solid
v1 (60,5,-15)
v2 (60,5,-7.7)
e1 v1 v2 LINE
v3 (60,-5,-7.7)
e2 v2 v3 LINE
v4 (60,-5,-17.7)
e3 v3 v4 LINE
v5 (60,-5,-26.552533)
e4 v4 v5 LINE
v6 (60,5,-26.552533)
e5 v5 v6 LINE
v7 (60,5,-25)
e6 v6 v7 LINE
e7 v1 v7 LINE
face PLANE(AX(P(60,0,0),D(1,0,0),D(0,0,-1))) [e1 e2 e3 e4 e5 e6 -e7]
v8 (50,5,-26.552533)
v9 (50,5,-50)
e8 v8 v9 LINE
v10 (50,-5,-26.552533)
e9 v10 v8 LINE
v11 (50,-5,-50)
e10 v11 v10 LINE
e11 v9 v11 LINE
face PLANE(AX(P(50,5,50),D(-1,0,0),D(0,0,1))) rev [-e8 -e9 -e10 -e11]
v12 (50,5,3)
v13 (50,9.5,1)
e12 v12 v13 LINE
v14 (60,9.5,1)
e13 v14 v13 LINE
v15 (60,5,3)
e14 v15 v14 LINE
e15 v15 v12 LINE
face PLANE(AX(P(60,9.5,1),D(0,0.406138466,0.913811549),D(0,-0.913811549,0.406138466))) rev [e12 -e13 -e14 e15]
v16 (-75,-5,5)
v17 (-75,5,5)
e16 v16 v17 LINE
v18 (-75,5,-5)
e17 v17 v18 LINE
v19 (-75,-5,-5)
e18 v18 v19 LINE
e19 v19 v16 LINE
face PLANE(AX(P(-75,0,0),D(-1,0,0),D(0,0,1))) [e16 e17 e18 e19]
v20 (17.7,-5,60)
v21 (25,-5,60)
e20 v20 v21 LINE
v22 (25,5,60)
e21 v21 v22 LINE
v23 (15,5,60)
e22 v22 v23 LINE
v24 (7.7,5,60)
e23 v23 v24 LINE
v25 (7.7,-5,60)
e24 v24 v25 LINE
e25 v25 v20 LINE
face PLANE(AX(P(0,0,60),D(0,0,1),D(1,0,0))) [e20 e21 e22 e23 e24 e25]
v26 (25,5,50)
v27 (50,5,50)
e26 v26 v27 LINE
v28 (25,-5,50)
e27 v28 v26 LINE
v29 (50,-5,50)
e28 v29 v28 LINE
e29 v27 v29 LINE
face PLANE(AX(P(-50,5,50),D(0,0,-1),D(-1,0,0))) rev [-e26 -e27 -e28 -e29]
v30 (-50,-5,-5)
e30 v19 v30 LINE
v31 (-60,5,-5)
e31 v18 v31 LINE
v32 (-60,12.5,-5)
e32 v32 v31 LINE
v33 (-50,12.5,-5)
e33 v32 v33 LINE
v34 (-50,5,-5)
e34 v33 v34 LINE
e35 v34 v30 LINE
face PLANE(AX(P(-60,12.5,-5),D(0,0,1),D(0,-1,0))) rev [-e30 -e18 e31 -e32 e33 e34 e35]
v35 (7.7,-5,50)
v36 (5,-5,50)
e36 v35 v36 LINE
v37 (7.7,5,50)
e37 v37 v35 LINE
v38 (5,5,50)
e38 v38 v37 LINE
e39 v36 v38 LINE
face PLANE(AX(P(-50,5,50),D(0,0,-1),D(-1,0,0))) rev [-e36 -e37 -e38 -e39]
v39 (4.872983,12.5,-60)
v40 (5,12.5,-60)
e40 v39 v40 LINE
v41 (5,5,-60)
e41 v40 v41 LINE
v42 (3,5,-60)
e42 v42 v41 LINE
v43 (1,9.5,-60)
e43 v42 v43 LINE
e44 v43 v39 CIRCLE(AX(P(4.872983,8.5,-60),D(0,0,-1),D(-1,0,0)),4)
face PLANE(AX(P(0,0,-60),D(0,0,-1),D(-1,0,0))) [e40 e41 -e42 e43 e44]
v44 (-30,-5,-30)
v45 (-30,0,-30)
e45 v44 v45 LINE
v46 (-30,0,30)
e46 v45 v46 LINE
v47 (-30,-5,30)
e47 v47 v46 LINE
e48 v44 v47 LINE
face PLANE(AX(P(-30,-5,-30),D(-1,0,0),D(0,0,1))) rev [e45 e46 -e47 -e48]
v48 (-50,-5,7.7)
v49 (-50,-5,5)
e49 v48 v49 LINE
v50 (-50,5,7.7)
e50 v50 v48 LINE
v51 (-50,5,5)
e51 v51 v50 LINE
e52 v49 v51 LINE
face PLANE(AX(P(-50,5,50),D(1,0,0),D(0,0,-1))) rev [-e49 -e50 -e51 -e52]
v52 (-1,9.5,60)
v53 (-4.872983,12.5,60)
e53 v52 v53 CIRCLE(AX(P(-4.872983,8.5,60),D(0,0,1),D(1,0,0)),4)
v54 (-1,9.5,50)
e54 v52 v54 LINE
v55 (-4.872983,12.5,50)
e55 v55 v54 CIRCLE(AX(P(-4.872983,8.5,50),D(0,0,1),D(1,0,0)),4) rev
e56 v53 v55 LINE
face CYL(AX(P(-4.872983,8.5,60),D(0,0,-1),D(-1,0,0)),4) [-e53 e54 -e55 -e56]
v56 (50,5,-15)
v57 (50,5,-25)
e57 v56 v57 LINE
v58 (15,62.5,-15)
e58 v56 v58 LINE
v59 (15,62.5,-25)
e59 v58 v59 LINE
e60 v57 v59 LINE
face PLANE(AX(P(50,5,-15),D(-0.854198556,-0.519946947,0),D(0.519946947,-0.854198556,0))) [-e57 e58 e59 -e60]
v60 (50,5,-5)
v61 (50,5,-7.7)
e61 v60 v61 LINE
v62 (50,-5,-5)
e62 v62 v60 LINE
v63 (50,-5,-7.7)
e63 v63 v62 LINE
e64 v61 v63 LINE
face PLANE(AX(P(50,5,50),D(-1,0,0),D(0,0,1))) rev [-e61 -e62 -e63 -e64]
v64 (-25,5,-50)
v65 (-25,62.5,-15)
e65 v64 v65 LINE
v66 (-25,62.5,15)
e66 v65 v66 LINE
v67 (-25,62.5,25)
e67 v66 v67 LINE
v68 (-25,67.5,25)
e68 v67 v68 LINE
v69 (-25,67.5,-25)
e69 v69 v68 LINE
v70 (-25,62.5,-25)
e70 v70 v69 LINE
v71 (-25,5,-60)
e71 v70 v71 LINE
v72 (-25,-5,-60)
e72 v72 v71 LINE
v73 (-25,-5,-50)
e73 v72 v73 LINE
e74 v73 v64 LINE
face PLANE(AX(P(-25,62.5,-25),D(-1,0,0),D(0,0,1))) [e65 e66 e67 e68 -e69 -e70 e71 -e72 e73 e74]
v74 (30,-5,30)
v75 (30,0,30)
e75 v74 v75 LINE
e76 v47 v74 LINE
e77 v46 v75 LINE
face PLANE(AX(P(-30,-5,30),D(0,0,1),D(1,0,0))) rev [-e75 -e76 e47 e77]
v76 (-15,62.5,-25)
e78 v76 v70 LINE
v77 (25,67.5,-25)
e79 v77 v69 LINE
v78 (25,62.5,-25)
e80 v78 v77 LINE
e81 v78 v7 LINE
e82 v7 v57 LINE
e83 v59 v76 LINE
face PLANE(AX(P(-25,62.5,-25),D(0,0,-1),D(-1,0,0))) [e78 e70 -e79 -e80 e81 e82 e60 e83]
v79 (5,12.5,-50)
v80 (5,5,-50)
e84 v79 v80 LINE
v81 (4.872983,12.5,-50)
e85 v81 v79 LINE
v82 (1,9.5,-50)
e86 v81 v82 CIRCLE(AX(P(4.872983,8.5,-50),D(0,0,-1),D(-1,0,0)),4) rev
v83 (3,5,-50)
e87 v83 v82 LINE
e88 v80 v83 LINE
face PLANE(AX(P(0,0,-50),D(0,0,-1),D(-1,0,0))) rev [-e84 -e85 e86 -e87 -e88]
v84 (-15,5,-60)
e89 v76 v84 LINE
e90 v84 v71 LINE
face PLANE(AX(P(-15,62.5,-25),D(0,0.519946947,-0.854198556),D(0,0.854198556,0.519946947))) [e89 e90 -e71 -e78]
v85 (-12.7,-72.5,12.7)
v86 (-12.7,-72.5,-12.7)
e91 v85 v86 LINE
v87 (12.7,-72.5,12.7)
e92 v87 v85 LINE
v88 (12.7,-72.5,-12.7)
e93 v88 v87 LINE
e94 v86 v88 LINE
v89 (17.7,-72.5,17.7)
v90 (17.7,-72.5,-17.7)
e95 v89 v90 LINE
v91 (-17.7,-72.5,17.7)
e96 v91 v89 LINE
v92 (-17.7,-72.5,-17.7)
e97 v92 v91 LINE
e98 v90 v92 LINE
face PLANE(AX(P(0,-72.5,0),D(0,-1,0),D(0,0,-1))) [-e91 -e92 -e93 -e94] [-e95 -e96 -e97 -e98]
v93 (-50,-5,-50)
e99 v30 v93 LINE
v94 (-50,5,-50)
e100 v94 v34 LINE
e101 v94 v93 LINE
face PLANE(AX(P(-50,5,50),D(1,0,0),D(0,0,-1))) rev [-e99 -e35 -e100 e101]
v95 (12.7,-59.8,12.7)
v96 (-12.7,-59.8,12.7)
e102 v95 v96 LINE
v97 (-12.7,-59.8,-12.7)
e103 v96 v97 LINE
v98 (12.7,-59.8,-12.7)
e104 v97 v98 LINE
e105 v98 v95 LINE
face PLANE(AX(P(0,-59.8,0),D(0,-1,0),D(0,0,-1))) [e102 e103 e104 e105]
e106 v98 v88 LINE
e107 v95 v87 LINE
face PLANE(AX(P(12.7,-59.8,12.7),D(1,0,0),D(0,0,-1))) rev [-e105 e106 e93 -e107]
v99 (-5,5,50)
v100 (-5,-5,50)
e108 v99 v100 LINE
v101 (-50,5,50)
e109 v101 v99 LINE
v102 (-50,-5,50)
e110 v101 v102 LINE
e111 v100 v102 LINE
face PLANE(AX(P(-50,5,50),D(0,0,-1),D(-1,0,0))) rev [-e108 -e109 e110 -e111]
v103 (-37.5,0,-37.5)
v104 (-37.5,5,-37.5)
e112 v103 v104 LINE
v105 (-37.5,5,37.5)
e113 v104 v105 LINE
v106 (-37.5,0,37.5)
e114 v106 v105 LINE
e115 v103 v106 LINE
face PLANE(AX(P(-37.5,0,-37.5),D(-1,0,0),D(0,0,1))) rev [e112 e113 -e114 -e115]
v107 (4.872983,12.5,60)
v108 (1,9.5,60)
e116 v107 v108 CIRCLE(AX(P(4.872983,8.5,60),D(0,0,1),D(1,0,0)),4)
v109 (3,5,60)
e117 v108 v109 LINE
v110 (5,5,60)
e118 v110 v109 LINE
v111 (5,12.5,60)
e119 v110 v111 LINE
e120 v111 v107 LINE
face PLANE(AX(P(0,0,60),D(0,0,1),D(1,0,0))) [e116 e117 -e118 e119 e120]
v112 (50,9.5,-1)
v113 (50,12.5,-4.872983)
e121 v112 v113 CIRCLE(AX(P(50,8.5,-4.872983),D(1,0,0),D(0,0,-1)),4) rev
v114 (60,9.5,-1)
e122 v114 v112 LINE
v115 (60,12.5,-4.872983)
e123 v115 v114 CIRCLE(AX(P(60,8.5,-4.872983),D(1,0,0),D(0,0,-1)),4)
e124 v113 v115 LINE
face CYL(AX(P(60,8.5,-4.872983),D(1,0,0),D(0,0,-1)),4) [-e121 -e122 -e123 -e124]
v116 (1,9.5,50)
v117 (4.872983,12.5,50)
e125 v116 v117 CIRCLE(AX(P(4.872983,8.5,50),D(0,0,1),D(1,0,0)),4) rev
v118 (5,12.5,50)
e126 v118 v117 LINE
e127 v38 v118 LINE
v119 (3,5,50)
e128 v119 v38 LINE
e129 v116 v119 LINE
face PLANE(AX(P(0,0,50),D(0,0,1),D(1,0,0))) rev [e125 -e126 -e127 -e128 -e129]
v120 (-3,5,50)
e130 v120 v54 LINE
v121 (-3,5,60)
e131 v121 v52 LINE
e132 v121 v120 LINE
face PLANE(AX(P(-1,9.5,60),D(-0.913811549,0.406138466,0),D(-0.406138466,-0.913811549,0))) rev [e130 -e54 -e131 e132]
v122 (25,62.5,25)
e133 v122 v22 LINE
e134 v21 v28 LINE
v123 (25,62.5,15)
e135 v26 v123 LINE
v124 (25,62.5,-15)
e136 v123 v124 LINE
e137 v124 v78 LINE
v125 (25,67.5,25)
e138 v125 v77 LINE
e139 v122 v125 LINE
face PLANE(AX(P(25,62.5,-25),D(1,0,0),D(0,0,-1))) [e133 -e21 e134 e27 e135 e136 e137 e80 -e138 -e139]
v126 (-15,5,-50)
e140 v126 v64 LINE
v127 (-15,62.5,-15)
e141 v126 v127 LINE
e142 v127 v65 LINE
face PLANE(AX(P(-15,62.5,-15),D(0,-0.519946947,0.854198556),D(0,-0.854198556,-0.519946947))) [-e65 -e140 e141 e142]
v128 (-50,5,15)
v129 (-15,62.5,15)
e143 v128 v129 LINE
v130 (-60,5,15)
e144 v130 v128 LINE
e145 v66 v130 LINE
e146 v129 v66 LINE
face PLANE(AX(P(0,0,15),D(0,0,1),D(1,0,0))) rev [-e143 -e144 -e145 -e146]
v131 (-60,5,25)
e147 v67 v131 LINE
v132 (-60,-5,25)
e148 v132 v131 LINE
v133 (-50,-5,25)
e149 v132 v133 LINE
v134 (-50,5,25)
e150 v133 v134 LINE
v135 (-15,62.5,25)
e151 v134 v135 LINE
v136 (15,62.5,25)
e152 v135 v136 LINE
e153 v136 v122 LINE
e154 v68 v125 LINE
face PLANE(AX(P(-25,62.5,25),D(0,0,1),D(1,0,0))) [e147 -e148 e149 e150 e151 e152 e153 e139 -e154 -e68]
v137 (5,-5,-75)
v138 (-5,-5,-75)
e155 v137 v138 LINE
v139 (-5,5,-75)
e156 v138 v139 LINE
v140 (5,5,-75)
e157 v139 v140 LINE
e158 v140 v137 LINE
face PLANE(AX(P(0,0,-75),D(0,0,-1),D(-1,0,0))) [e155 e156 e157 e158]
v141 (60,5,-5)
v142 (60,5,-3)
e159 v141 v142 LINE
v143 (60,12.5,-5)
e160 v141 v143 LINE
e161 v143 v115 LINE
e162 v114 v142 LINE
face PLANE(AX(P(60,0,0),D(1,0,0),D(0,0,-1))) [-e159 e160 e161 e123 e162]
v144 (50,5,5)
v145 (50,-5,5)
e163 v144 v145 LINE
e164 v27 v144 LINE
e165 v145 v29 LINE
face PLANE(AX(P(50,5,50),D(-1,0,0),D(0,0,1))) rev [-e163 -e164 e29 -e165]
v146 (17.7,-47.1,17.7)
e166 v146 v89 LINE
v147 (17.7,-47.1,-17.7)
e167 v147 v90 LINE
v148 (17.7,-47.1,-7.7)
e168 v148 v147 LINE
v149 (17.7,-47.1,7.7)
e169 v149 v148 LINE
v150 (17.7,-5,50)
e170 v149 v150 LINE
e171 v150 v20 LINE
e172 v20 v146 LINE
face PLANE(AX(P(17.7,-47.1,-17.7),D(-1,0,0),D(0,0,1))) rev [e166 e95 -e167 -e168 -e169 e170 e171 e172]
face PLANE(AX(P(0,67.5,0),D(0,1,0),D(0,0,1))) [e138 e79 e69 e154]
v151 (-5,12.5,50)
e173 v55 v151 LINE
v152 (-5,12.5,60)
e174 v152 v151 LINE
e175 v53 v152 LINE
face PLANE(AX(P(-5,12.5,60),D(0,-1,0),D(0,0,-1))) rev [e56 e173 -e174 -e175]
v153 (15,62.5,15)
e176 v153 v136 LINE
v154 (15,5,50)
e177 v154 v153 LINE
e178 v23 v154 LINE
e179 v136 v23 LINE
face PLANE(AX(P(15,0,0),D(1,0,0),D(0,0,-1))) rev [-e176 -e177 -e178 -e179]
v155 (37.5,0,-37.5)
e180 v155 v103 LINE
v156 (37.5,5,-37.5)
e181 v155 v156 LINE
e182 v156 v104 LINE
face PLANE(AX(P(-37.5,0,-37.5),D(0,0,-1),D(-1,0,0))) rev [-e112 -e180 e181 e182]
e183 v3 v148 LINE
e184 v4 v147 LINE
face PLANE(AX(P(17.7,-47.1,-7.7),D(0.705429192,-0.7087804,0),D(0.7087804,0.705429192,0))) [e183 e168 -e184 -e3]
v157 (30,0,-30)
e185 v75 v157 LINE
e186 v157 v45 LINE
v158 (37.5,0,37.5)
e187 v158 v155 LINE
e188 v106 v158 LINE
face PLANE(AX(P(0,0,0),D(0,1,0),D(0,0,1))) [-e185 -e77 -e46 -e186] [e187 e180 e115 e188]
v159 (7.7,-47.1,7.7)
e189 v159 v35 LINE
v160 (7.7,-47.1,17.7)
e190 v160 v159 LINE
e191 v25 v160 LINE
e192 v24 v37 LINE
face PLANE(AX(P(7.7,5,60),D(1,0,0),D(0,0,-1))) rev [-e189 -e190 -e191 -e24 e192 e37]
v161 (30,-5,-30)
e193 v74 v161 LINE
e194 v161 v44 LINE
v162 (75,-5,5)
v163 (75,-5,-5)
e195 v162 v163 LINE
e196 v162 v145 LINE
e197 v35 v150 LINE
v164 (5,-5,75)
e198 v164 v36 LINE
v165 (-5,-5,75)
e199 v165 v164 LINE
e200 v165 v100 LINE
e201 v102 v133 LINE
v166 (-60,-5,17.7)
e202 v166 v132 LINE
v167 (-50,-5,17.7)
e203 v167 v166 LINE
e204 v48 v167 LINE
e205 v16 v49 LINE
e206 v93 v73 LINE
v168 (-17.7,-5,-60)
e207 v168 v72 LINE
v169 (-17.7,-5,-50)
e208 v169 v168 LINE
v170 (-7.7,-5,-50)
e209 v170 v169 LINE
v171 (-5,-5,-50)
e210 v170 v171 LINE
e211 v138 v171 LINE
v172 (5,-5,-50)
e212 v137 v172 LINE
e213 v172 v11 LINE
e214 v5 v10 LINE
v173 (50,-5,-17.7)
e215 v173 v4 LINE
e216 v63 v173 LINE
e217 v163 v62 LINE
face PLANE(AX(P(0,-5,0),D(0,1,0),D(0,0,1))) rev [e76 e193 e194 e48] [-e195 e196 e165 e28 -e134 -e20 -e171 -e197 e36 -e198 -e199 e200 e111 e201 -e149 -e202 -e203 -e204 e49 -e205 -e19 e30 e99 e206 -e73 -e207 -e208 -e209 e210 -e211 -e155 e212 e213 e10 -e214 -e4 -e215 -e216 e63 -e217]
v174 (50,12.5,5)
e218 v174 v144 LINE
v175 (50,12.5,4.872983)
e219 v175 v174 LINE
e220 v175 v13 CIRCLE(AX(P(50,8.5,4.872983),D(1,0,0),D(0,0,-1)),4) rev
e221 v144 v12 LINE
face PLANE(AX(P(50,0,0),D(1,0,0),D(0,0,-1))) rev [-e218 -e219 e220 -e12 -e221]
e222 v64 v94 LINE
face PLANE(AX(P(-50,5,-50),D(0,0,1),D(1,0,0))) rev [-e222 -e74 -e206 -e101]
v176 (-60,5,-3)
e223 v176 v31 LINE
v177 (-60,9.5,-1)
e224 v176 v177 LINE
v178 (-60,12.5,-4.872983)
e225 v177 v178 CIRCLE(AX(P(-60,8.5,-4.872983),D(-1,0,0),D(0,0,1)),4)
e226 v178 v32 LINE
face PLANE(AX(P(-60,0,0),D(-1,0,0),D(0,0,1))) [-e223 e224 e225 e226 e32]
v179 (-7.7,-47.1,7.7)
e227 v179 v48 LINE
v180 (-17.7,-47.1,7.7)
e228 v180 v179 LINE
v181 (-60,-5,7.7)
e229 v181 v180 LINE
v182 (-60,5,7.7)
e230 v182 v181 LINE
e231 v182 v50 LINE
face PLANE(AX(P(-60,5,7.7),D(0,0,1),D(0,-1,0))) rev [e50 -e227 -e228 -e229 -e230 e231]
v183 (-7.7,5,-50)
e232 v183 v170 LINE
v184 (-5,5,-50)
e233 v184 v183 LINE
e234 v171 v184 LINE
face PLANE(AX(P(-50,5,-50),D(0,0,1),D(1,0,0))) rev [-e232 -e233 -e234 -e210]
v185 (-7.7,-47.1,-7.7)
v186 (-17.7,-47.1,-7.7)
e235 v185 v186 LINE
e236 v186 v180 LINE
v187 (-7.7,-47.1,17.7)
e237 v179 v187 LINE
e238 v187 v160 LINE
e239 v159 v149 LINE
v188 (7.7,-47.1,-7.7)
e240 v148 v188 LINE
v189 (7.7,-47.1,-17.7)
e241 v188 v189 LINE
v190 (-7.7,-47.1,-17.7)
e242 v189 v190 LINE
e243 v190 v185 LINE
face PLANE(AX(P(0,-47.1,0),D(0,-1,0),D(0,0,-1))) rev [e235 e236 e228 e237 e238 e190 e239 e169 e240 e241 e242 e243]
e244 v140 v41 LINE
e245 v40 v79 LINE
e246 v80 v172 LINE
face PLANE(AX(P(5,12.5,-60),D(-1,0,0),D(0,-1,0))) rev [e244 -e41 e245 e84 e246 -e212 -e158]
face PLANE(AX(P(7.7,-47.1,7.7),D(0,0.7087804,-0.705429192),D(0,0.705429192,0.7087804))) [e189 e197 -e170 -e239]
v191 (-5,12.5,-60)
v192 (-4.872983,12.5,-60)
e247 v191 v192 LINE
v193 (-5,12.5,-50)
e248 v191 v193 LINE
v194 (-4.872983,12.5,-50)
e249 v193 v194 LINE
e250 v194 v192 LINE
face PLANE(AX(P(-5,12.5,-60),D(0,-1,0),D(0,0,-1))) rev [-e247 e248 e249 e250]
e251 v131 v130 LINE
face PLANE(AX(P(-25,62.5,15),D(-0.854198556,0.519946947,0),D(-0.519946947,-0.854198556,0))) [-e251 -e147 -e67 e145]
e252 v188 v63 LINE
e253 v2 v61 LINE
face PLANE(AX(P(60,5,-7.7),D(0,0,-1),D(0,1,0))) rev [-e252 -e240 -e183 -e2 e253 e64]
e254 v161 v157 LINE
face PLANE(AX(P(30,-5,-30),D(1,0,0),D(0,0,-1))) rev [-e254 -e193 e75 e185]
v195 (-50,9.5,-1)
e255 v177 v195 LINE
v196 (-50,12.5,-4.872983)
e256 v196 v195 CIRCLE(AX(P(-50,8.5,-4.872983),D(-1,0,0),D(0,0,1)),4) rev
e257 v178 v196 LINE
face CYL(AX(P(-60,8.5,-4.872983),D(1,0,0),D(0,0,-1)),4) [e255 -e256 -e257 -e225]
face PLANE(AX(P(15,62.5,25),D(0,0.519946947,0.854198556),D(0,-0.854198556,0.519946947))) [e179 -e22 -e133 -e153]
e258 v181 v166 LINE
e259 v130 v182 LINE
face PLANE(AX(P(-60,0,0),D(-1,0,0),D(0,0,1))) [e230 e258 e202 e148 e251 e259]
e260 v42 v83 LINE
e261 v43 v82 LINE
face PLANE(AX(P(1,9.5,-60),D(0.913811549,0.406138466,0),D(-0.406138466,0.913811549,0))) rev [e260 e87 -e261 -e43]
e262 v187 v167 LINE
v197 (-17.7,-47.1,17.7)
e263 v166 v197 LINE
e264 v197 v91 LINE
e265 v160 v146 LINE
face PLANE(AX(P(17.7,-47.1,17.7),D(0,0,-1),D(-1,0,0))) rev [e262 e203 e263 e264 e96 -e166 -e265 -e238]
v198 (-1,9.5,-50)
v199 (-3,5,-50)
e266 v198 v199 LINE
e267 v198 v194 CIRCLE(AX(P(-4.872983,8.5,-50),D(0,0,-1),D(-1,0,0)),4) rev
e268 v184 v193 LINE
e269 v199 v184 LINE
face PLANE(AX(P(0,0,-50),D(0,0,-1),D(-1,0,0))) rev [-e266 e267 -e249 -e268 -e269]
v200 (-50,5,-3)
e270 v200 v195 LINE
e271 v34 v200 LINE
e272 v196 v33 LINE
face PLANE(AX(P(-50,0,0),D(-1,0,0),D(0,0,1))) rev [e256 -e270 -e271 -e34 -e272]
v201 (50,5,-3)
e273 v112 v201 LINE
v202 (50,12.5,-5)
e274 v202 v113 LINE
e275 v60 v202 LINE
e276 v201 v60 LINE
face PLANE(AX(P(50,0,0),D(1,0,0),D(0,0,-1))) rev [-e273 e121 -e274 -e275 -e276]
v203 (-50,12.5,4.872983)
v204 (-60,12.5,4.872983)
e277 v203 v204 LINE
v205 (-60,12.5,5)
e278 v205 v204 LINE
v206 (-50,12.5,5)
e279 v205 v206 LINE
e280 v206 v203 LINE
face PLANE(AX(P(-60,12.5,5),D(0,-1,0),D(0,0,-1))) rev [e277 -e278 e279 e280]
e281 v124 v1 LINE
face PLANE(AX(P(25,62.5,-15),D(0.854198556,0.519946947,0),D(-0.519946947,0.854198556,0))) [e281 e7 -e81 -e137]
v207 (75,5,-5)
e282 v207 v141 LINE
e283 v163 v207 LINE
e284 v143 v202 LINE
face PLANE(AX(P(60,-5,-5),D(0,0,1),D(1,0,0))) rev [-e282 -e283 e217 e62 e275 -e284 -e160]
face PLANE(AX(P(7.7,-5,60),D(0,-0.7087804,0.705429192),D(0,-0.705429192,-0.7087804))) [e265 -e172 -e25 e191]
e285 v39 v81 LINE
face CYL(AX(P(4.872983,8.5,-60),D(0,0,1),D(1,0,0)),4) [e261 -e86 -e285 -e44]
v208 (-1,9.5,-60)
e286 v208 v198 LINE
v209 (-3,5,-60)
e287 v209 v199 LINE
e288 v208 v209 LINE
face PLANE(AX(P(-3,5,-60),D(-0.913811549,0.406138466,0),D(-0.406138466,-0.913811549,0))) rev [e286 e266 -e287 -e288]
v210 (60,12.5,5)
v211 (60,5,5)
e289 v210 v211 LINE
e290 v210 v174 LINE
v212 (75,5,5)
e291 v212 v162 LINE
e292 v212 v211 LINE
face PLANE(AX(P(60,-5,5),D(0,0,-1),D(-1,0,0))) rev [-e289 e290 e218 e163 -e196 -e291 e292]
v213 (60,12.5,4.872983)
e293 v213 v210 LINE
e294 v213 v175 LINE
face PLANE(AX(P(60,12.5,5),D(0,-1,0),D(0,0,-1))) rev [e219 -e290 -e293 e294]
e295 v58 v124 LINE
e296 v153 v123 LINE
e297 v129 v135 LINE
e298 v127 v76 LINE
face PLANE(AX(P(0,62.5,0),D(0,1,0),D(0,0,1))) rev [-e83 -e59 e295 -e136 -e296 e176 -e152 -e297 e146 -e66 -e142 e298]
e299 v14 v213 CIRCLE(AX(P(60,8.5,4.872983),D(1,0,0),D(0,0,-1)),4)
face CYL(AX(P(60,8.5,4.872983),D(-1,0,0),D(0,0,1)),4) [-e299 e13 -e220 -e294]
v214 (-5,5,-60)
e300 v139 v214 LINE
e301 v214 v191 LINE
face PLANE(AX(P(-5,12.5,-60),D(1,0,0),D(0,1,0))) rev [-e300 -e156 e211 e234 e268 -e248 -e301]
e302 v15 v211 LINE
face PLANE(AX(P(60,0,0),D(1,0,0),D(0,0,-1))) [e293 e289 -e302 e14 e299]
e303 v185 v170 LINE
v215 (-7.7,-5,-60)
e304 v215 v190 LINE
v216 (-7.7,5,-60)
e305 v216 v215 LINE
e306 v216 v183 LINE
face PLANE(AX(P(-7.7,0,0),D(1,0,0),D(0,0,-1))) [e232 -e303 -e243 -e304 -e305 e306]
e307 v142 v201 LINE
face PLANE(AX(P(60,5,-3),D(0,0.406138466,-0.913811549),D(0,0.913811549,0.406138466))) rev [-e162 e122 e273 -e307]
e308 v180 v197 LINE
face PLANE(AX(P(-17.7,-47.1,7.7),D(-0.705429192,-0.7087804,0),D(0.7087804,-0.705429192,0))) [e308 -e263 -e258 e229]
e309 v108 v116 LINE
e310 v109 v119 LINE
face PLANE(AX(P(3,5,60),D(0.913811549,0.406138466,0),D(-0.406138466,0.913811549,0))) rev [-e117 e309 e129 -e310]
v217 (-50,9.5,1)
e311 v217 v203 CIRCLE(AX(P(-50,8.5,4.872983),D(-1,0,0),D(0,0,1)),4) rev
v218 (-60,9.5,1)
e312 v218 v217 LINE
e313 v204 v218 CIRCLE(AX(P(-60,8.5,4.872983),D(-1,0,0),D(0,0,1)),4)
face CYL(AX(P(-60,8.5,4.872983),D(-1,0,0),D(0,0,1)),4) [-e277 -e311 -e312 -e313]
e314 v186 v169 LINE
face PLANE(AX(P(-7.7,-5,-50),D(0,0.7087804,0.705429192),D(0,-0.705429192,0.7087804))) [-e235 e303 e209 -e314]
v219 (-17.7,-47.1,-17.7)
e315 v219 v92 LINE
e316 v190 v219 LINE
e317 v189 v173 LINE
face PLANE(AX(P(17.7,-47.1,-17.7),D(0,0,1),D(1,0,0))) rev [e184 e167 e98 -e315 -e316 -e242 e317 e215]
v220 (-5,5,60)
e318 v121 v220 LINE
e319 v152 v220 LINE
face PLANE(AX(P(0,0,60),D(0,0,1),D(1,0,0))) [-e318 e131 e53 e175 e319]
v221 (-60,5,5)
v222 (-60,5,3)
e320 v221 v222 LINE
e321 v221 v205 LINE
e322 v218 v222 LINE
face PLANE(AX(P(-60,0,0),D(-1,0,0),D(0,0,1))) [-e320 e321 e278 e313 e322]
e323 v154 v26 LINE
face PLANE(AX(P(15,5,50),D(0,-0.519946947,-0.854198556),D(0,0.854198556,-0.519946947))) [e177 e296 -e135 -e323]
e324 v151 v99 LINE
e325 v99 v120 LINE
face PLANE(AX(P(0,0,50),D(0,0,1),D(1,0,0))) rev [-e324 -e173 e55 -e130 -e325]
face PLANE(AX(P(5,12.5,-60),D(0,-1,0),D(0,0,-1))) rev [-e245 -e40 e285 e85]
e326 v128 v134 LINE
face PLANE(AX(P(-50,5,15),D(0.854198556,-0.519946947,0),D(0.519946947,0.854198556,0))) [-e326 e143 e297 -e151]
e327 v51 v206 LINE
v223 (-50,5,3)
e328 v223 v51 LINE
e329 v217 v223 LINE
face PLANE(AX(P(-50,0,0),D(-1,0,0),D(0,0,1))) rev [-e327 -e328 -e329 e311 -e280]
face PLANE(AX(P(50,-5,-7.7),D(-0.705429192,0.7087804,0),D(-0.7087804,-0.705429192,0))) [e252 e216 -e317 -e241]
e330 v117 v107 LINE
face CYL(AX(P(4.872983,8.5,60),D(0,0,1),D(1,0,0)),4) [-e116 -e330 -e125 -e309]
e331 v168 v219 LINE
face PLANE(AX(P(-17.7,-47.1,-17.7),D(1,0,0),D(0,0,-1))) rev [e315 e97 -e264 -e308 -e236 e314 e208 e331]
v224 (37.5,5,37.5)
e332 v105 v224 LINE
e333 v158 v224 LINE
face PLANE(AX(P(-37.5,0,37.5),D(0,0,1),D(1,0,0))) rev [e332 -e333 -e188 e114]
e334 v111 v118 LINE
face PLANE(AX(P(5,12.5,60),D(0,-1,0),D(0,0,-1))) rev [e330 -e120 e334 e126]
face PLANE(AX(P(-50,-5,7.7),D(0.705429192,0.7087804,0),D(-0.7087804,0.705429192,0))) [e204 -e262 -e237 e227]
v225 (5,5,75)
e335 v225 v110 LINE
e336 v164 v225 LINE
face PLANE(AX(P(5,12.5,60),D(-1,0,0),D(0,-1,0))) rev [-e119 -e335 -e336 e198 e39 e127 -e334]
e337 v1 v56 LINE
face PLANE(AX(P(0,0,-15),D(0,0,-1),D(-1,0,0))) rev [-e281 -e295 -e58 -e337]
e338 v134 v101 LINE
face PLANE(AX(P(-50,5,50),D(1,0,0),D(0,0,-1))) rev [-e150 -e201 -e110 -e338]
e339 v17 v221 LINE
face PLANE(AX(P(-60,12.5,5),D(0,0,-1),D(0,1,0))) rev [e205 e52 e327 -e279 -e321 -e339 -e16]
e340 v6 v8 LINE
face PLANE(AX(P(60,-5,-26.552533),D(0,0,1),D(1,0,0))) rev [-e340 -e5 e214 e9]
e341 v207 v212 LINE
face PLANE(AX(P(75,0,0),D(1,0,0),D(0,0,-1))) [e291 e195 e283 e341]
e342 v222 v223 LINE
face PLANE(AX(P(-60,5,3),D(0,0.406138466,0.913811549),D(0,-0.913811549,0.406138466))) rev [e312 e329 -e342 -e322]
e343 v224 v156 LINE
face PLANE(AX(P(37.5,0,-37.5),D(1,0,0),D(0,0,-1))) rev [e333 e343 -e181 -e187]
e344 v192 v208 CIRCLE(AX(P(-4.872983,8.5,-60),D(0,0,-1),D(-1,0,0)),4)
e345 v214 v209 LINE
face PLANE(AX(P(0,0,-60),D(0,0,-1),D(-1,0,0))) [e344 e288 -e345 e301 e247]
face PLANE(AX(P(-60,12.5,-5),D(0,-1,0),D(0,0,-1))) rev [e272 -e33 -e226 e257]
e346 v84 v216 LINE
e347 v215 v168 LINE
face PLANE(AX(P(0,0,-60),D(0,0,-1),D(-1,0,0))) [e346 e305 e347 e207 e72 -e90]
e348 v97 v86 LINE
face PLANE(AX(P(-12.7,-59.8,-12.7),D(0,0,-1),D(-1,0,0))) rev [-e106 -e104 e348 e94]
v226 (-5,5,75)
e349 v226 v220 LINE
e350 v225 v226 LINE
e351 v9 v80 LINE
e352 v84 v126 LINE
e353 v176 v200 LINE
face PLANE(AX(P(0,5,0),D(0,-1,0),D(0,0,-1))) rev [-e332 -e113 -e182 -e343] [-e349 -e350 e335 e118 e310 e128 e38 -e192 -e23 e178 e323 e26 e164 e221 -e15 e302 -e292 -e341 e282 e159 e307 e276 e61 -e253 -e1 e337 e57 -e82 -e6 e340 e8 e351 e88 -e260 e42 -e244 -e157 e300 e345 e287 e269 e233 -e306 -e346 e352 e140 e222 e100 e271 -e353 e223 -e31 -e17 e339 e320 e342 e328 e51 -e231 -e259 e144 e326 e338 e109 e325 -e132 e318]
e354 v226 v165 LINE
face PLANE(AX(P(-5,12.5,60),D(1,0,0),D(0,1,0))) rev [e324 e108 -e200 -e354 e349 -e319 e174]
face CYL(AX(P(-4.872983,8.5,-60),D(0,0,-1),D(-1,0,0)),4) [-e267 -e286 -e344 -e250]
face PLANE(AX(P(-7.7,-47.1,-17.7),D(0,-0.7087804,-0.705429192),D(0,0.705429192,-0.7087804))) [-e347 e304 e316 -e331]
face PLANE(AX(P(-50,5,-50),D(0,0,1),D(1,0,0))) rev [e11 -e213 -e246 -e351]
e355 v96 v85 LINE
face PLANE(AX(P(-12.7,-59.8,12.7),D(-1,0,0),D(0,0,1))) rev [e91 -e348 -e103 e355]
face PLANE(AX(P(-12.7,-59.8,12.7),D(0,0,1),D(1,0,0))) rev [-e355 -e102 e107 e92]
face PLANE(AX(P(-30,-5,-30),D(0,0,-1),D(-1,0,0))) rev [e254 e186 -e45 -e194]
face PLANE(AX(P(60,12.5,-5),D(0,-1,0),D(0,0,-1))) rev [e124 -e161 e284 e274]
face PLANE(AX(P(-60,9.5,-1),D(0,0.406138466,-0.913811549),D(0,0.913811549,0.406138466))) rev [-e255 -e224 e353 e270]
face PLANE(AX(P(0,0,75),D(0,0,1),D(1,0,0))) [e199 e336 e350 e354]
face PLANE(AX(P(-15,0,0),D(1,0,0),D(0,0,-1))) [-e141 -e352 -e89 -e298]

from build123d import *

# Parameters (mm, degrees)
SKETCH2_W            = 100
SKETCH2_H            = 100
BOSS_EXTRUDE1_DEPTH  = 5
SKETCH3_W            = 100
SKETCH3_H            = 100
BOSS_EXTRUDE2_DEPTH  = 5
SKETCH8_R            = 5
BOSS_EXTRUDE7_DEPTH  = 30
BOSS_EXTRUDE21_DEPTH = 10
FILLET14_R           = 4
FILLET13_R           = 4
SKETCH24_W           = 10
SKETCH24_H           = 10
BOSS_EXTRUDE22_DEPTH = 15
BOSS_EXTRUDE25_DEPTH = 10
SKETCH26_W           = 10
SKETCH26_H           = 10
BOSS_EXTRUDE26_DEPTH = 15
FILLET18_R           = 4
FILLET17_R           = 4
BOSS_EXTRUDE23_DEPTH = 10
SKETCH25_W           = 10
SKETCH25_H           = 10
BOSS_EXTRUDE24_DEPTH = 15
FILLET15_R           = 4
FILLET16_R           = 4
BOSS_EXTRUDE10_DEPTH = 10
FILLET19_R           = 4
SKETCH27_W           = 10
SKETCH27_H           = 10
BOSS_EXTRUDE27_DEPTH = 15
FILLET20_R           = 4
SKETCH62_R           = 11.223510807
CUT_EXTRUDE3_DEPTH   = 30
SKETCH64_W           = 35.4
SKETCH64_H           = 35.4
BOSS_EXTRUDE53_DEPTH = 25.4
SKETCH66_W           = 25.4
SKETCH66_H           = 25.4
CUT_EXTRUDE4_DEPTH   = 12.7
SKETCH67_W           = 50
SKETCH67_H           = 50
BOSS_EXTRUDE54_DEPTH = 5
SKETCH68_W           = 17.3
SKETCH68_H           = 10
BOSS_EXTRUDE55_DEPTH = 10
SKETCH69_W           = 17.3
SKETCH69_H           = 10
BOSS_EXTRUDE56_DEPTH = 10
SKETCH70_W           = 17.3
SKETCH70_H           = 10
BOSS_EXTRUDE57_DEPTH = 10
SKETCH74_W           = 17.3
SKETCH74_H           = 10
BOSS_EXTRUDE58_DEPTH = 10
BOSS_EXTRUDE59_DEPTH = 10
BOSS_EXTRUDE60_DEPTH = 10
BOSS_EXTRUDE61_DEPTH = 10
BOSS_EXTRUDE62_DEPTH = 10
BOSS_EXTRUDE63_DEPTH = 10
BOSS_EXTRUDE64_DEPTH = 10
SKETCH85_W           = 17.3
SKETCH85_H           = 10
BOSS_EXTRUDE65_DEPTH = 10
BOSS_EXTRUDE66_DEPTH = 10
BOSS_EXTRUDE67_DEPTH = 10
SKETCH90_W           = 75
SKETCH90_H           = 75
CUT_EXTRUDE5_DEPTH   = 5
SKETCH91_W           = 60
SKETCH91_H           = 60
CUT_EXTRUDE6_DEPTH   = 10


with BuildPart() as part:
    # Sketch2 → Boss-Extrude1 (new body)
    with BuildSketch(Plane(origin=(0, 0, 0), x_dir=(1, 0, 0), z_dir=(0, 1, 0))):
        Rectangle(SKETCH2_W, SKETCH2_H)
    extrude(amount=BOSS_EXTRUDE1_DEPTH)

    # Sketch3 → Boss-Extrude2 (add)
    with BuildSketch(Plane.XZ):
        Rectangle(SKETCH3_W, SKETCH3_H)
    extrude(amount=BOSS_EXTRUDE2_DEPTH)

    # Sketch8 → Boss-Extrude7 (add)
    with BuildSketch(Plane.XZ.offset(5)):
        with Locations(Location((0, 0, 0), (0, 0, 90))):
            Circle(SKETCH8_R)
    extrude(amount=BOSS_EXTRUDE7_DEPTH)

    # Sketch11 → Boss-Extrude21 (add)
    with BuildSketch(Plane(origin=(50, 0, 0), x_dir=(0, 0, -1), z_dir=(1, 0, 0))):
        Polygon((5, -5), (5, 12.5), (1, 12.5), (1, 9.5), (3, 5), (-3, 5), (-1, 9.5), (-1, 12.5), (-5, 12.5), (-5, -5), align=None)
    extrude(amount=BOSS_EXTRUDE21_DEPTH)

    # Fillet14
    # the kernel refuses this fillet: 4 mm, written as the material it takes off along each edge
    with BuildSketch(Plane(origin=(40.317541634, 12.5, -1), x_dir=(0, -1, 0), z_dir=(1, 0, 0))) as fillet14_piece_1:
        with BuildLine():
            CenterArc((4, 3.872983346), FILLET14_R, 180, 75.522487814)
            Line((0, 3.872983346), (-0.08, 3.872983346))
            Line((-0.08, 3.872983346), (-0.08, 0))
            Line((-0.08, 0), (0, -0.08))
            ThreePointArc((0, -0.08), (1.5, -0.08), (2.98, -0.077459667))
            Line((2.98, -0.077459667), (3, 0))
        make_face()
    extrude(amount=29.364916731, mode=Mode.SUBTRACT)

    # Fillet13
    # the kernel refuses this fillet: 4 mm, written as the material it takes off along each edge
    with BuildSketch(Plane(origin=(40.317541634, 12.5, 1), x_dir=(0, 0, 1), z_dir=(1, 0, 0))) as fillet13_piece_1:
        with BuildLine():
            CenterArc((3.872983346, 4), FILLET13_R, 194.477512186, 75.522487814)
            Line((0, 3), (-0.077459667, 2.98))
            ThreePointArc((-0.077459667, 2.98), (-0.08, 1.5), (-0.08, 0))
            Line((-0.08, 0), (0, -0.08))
            Line((0, -0.08), (3.872983346, -0.08))
            Line((3.872983346, -0.08), (3.872983346, 0))
        make_face()
    extrude(amount=29.364916731, mode=Mode.SUBTRACT)

    # Sketch24 → Boss-Extrude22 (add)
    with BuildSketch(Plane(origin=(60, 0, 0), x_dir=(0, 0, -1), z_dir=(1, 0, 0))):
        Rectangle(SKETCH24_W, SKETCH24_H)
    extrude(amount=BOSS_EXTRUDE22_DEPTH)

    # Sketch13 → Boss-Extrude25 (add)
    with BuildSketch(Plane.ZY.offset(50)):
        Polygon((-5, 12.5), (-5, -5), (5, -5), (5, 12.5), (1, 12.5), (1, 9.5), (3, 5), (-3, 5), (-1, 9.5), (-1, 12.5), align=None)
    extrude(amount=BOSS_EXTRUDE25_DEPTH)

    # Sketch26 → Boss-Extrude26 (add)
    with BuildSketch(Plane.ZY.offset(60)):
        Rectangle(SKETCH26_W, SKETCH26_H)
    extrude(amount=BOSS_EXTRUDE26_DEPTH)

    # Fillet18
    # the kernel refuses this fillet: 4 mm, written as the material it takes off along each edge
    with BuildSketch(Plane(origin=(-40.317541634, 12.5, 1), x_dir=(0, -1, 0), z_dir=(-1, 0, 0))) as fillet18_piece_1:
        with BuildLine():
            CenterArc((4, 3.872983346), FILLET18_R, 180, 75.522487814)
            Line((0, 3.872983346), (-0.08, 3.872983346))
            Line((-0.08, 3.872983346), (-0.08, 0))
            Line((-0.08, 0), (0, -0.08))
            ThreePointArc((0, -0.08), (1.5, -0.08), (2.98, -0.077459667))
            Line((2.98, -0.077459667), (3, 0))
        make_face()
    extrude(amount=29.364916731, mode=Mode.SUBTRACT)

    # Fillet17
    # the kernel refuses this fillet: 4 mm, written as the material it takes off along each edge
    with BuildSketch(Plane(origin=(-40.317541634, 12.5, -1), x_dir=(0, 0, -1), z_dir=(-1, 0, 0))) as fillet17_piece_1:
        with BuildLine():
            CenterArc((3.872983346, 4), FILLET17_R, 194.477512186, 75.522487814)
            Line((0, 3), (-0.077459667, 2.98))
            ThreePointArc((-0.077459667, 2.98), (-0.08, 1.5), (-0.08, 0))
            Line((-0.08, 0), (0, -0.08))
            Line((0, -0.08), (3.872983346, -0.08))
            Line((3.872983346, -0.08), (3.872983346, 0))
        make_face()
    extrude(amount=29.364916731, mode=Mode.SUBTRACT)

    # Sketch14 → Boss-Extrude23 (add)
    with BuildSketch(Plane(origin=(0, 0, -50), x_dir=(-1, 0, 0), z_dir=(0, 0, -1))):
        Polygon((-5, 12.5), (-1, 12.5), (-1, 9.5), (-3, 5), (3, 5), (1, 9.5), (1, 12.5), (5, 12.5), (5, -5), (-5, -5), align=None)
    extrude(amount=BOSS_EXTRUDE23_DEPTH)

    # Sketch25 → Boss-Extrude24 (add)
    with BuildSketch(Plane(origin=(0, 0, -60), x_dir=(-1, 0, 0), z_dir=(0, 0, -1))):
        Rectangle(SKETCH25_W, SKETCH25_H)
    extrude(amount=BOSS_EXTRUDE24_DEPTH)

    # Fillet15
    # the kernel refuses this fillet: 4 mm, written as the material it takes off along each edge
    with BuildSketch(Plane(origin=(-1, 12.5, -40.317541634), x_dir=(0, -1, 0), z_dir=(0, 0, -1))) as fillet15_piece_1:
        with BuildLine():
            CenterArc((4, 3.872983346), FILLET15_R, 180, 75.522487814)
            Line((0, 3.872983346), (-0.08, 3.872983346))
            Line((-0.08, 3.872983346), (-0.08, 0))
            Line((-0.08, 0), (0, -0.08))
            ThreePointArc((0, -0.08), (1.5, -0.08), (2.98, -0.077459667))
            Line((2.98, -0.077459667), (3, 0))
        make_face()
    extrude(amount=29.364916731, mode=Mode.SUBTRACT)

    # Fillet16
    # the kernel refuses this fillet: 4 mm, written as the material it takes off along each edge
    with BuildSketch(Plane(origin=(1, 12.5, -40.317541634), x_dir=(0, -1, 0), z_dir=(0, 0, -1))) as fillet16_piece_1:
        with BuildLine():
            CenterArc((4, -3.872983346), FILLET16_R, 104.477512186, 75.522487814)
            Line((0, -3.872983346), (-0.08, -3.872983346))
            Line((-0.08, -3.872983346), (-0.08, 0))
            Line((-0.08, 0), (0, 0.08))
            ThreePointArc((0, 0.08), (1.5, 0.08), (2.98, 0.077459667))
            Line((2.98, 0.077459667), (3, 0))
        make_face()
    extrude(amount=29.364916731, mode=Mode.SUBTRACT)

    # Sketch12 → Boss-Extrude10 (add)
    with BuildSketch(Plane.XY.offset(50)):
        Polygon((-5, 12.5), (-5, -5), (5, -5), (5, 12.5), (1, 12.5), (1, 9.5), (3, 5), (-3, 5), (-1, 9.5), (-1, 12.5), align=None)
    extrude(amount=BOSS_EXTRUDE10_DEPTH)

    # Fillet19
    # the kernel refuses this fillet: 4 mm, written as the material it takes off along each edge
    with BuildSketch(Plane(origin=(-1, 12.5, 40.317541634), x_dir=(-1, 0, 0), z_dir=(0, 0, 1))) as fillet19_piece_1:
        with BuildLine():
            CenterArc((3.872983346, 4), FILLET19_R, 194.477512186, 75.522487814)
            Line((0, 3), (-0.077459667, 2.98))
            ThreePointArc((-0.077459667, 2.98), (-0.08, 1.5), (-0.08, 0))
            Line((-0.08, 0), (0, -0.08))
            Line((0, -0.08), (3.872983346, -0.08))
            Line((3.872983346, -0.08), (3.872983346, 0))
        make_face()
    extrude(amount=29.364916731, mode=Mode.SUBTRACT)

    # Sketch27 → Boss-Extrude27 (add)
    with BuildSketch(Plane.XY.offset(60)):
        Rectangle(SKETCH27_W, SKETCH27_H)
    extrude(amount=BOSS_EXTRUDE27_DEPTH)

    # Fillet20
    # the kernel refuses this fillet: 4 mm, written as the material it takes off along each edge
    with BuildSketch(Plane(origin=(1, 12.5, 40.317541634), x_dir=(1, 0, 0), z_dir=(0, 0, 1))) as fillet20_piece_1:
        with BuildLine():
            CenterArc((3.872983346, -4), FILLET20_R, 90, 75.522487814)
            Line((0, -3), (-0.077459667, -2.98))
            ThreePointArc((-0.077459667, -2.98), (-0.08, -1.5), (-0.08, 0))
            Line((-0.08, 0), (0, 0.08))
            Line((0, 0.08), (3.872983346, 0.08))
            Line((3.872983346, 0.08), (3.872983346, 0))
        make_face()
    extrude(amount=29.364916731, mode=Mode.SUBTRACT)

    # Sketch62 → Cut-Extrude3 (cut)
    with BuildSketch(Plane.XZ.offset(5)):
        Circle(SKETCH62_R)
    extrude(amount=CUT_EXTRUDE3_DEPTH, mode=Mode.SUBTRACT)

    # Sketch68 → Boss-Extrude55 (add)
    with BuildSketch(Plane.XY.offset(50)):
        with Locations((16.35, 0)):
            Rectangle(SKETCH68_W, SKETCH68_H)
    extrude(amount=BOSS_EXTRUDE55_DEPTH)

    # Sketch69 → Boss-Extrude56 (add)
    with BuildSketch(Plane(origin=(50, 0, 0), x_dir=(0, 0, -1), z_dir=(1, 0, 0))):
        with Locations((17.90253263, 0)):
            Rectangle(SKETCH69_W, SKETCH69_H)
    extrude(amount=BOSS_EXTRUDE56_DEPTH)

    # Sketch70 → Boss-Extrude57 (add)
    with BuildSketch(Plane(origin=(0, 0, -50), x_dir=(-1, 0, 0), z_dir=(0, 0, -1))):
        with Locations((16.35, 0)):
            Rectangle(SKETCH70_W, SKETCH70_H)
    extrude(amount=BOSS_EXTRUDE57_DEPTH)

    # Sketch74 → Boss-Extrude58 (add)
    with BuildSketch(Plane.ZY.offset(50)):
        with Locations((16.35, 0)):
            Rectangle(SKETCH74_W, SKETCH74_H)
    extrude(amount=BOSS_EXTRUDE58_DEPTH)



with BuildPart() as body_2:
    # Sketch64 → Boss-Extrude53 (new body)
    with BuildSketch(Plane(origin=(0, -72.5, 0), x_dir=(1, 0, 0), z_dir=(0, 1, 0))):
        Rectangle(SKETCH64_W, SKETCH64_H)
    extrude(amount=BOSS_EXTRUDE53_DEPTH)

    # Sketch66 → Cut-Extrude4 (cut)
    with BuildSketch(Plane(origin=(0, -72.5, 0), x_dir=(-1, 0, 0), z_dir=(0, -1, 0))):
        Rectangle(SKETCH66_W, SKETCH66_H)
    extrude(amount=-CUT_EXTRUDE4_DEPTH, mode=Mode.SUBTRACT)


with BuildPart() as body_3:
    # Sketch67 → Boss-Extrude54 (new body)
    with BuildSketch(Plane(origin=(0, 67.5, 0), x_dir=(1, 0, 0), z_dir=(0, 1, 0))):
        Rectangle(SKETCH67_W, SKETCH67_H)
    extrude(amount=-BOSS_EXTRUDE54_DEPTH)


with BuildPart() as part_1:
    add(part.part)

    add(body_2.part)  # Boss-Extrude59 merges body 2
    # Sketch76 → Boss-Extrude59 (add)
    with BuildSketch(Plane.ZY.offset(17.7)):
        Polygon((-17.7, -47.1), (-60, -5), (-50, -5), (-7.7, -47.1), align=None)
    extrude(amount=-BOSS_EXTRUDE59_DEPTH)


    add(body_3.part)  # Boss-Extrude60 merges body 3
    # Sketch77 → Boss-Extrude60 (add)
    with BuildSketch(Plane.ZY.offset(25)):
        Polygon((-25, 62.5), (-60, 5), (-50, 5), (-15, 62.5), align=None)
    extrude(amount=-BOSS_EXTRUDE60_DEPTH)

    # Sketch78 → Boss-Extrude61 (add)
    with BuildSketch(Plane.XY.offset(17.7)):
        Polygon((-17.7, -47.1), (-60, -5), (-50, -5), (-7.7, -47.1), align=None)
    extrude(amount=-BOSS_EXTRUDE61_DEPTH)

    # Sketch79 → Boss-Extrude62 (add)
    with BuildSketch(Plane.XY.offset(25)):
        Polygon((-25, 62.5), (-60, 5), (-50, 5), (-15, 62.5), align=None)
    extrude(amount=-BOSS_EXTRUDE62_DEPTH)

    # Sketch82 → Boss-Extrude63 (add)
    with BuildSketch(Plane(origin=(17.7, 0, 0), x_dir=(0, 0, -1), z_dir=(1, 0, 0))):
        Polygon((-60, -5), (-17.7, -47.1), (-7.7, -47.1), (-50, -5), align=None)
    extrude(amount=-BOSS_EXTRUDE63_DEPTH)

    # Sketch83 → Boss-Extrude64 (add)
    with BuildSketch(Plane(origin=(25, 0, 0), x_dir=(0, 0, -1), z_dir=(1, 0, 0))):
        Polygon((-25, 62.5), (-60, 5), (-50, 5), (-15, 62.5), align=None)
    extrude(amount=-BOSS_EXTRUDE64_DEPTH)

    # Sketch85 → Boss-Extrude65 (add)
    with BuildSketch(Plane(origin=(50, 0, 0), x_dir=(0, 0, -1), z_dir=(1, 0, 0))):
        with Locations((16.35, 0)):
            Rectangle(SKETCH85_W, SKETCH85_H)
    extrude(amount=BOSS_EXTRUDE65_DEPTH)

    # Sketch86 → Boss-Extrude66 (add)
    with BuildSketch(Plane(origin=(0, 0, -25), x_dir=(-1, 0, 0), z_dir=(0, 0, -1))):
        Polygon((-25, 62.5), (-60, 5), (-50, 5), (-15, 62.5), align=None)
    extrude(amount=-BOSS_EXTRUDE66_DEPTH)

    # Sketch89 → Boss-Extrude67 (add)
    with BuildSketch(Plane(origin=(0, 0, -17.7), x_dir=(-1, 0, 0), z_dir=(0, 0, -1))):
        Polygon((-60, -5), (-50, -5), (-7.7, -47.1), (-17.7, -47.1), align=None)
    extrude(amount=-BOSS_EXTRUDE67_DEPTH)

    # Sketch90 → Cut-Extrude5 (cut)
    with BuildSketch(Plane(origin=(0, 5, 0), x_dir=(1, 0, 0), z_dir=(0, 1, 0))):
        Rectangle(SKETCH90_W, SKETCH90_H)
    extrude(amount=-CUT_EXTRUDE5_DEPTH, mode=Mode.SUBTRACT)

    # Sketch91 → Cut-Extrude6 (cut)
    with BuildSketch(Plane(origin=(0, 5, 0), x_dir=(1, 0, 0), z_dir=(0, 1, 0))):
        Rectangle(SKETCH91_W, SKETCH91_H)
    extrude(amount=-CUT_EXTRUDE6_DEPTH, mode=Mode.SUBTRACT)


solid = part_1.part
